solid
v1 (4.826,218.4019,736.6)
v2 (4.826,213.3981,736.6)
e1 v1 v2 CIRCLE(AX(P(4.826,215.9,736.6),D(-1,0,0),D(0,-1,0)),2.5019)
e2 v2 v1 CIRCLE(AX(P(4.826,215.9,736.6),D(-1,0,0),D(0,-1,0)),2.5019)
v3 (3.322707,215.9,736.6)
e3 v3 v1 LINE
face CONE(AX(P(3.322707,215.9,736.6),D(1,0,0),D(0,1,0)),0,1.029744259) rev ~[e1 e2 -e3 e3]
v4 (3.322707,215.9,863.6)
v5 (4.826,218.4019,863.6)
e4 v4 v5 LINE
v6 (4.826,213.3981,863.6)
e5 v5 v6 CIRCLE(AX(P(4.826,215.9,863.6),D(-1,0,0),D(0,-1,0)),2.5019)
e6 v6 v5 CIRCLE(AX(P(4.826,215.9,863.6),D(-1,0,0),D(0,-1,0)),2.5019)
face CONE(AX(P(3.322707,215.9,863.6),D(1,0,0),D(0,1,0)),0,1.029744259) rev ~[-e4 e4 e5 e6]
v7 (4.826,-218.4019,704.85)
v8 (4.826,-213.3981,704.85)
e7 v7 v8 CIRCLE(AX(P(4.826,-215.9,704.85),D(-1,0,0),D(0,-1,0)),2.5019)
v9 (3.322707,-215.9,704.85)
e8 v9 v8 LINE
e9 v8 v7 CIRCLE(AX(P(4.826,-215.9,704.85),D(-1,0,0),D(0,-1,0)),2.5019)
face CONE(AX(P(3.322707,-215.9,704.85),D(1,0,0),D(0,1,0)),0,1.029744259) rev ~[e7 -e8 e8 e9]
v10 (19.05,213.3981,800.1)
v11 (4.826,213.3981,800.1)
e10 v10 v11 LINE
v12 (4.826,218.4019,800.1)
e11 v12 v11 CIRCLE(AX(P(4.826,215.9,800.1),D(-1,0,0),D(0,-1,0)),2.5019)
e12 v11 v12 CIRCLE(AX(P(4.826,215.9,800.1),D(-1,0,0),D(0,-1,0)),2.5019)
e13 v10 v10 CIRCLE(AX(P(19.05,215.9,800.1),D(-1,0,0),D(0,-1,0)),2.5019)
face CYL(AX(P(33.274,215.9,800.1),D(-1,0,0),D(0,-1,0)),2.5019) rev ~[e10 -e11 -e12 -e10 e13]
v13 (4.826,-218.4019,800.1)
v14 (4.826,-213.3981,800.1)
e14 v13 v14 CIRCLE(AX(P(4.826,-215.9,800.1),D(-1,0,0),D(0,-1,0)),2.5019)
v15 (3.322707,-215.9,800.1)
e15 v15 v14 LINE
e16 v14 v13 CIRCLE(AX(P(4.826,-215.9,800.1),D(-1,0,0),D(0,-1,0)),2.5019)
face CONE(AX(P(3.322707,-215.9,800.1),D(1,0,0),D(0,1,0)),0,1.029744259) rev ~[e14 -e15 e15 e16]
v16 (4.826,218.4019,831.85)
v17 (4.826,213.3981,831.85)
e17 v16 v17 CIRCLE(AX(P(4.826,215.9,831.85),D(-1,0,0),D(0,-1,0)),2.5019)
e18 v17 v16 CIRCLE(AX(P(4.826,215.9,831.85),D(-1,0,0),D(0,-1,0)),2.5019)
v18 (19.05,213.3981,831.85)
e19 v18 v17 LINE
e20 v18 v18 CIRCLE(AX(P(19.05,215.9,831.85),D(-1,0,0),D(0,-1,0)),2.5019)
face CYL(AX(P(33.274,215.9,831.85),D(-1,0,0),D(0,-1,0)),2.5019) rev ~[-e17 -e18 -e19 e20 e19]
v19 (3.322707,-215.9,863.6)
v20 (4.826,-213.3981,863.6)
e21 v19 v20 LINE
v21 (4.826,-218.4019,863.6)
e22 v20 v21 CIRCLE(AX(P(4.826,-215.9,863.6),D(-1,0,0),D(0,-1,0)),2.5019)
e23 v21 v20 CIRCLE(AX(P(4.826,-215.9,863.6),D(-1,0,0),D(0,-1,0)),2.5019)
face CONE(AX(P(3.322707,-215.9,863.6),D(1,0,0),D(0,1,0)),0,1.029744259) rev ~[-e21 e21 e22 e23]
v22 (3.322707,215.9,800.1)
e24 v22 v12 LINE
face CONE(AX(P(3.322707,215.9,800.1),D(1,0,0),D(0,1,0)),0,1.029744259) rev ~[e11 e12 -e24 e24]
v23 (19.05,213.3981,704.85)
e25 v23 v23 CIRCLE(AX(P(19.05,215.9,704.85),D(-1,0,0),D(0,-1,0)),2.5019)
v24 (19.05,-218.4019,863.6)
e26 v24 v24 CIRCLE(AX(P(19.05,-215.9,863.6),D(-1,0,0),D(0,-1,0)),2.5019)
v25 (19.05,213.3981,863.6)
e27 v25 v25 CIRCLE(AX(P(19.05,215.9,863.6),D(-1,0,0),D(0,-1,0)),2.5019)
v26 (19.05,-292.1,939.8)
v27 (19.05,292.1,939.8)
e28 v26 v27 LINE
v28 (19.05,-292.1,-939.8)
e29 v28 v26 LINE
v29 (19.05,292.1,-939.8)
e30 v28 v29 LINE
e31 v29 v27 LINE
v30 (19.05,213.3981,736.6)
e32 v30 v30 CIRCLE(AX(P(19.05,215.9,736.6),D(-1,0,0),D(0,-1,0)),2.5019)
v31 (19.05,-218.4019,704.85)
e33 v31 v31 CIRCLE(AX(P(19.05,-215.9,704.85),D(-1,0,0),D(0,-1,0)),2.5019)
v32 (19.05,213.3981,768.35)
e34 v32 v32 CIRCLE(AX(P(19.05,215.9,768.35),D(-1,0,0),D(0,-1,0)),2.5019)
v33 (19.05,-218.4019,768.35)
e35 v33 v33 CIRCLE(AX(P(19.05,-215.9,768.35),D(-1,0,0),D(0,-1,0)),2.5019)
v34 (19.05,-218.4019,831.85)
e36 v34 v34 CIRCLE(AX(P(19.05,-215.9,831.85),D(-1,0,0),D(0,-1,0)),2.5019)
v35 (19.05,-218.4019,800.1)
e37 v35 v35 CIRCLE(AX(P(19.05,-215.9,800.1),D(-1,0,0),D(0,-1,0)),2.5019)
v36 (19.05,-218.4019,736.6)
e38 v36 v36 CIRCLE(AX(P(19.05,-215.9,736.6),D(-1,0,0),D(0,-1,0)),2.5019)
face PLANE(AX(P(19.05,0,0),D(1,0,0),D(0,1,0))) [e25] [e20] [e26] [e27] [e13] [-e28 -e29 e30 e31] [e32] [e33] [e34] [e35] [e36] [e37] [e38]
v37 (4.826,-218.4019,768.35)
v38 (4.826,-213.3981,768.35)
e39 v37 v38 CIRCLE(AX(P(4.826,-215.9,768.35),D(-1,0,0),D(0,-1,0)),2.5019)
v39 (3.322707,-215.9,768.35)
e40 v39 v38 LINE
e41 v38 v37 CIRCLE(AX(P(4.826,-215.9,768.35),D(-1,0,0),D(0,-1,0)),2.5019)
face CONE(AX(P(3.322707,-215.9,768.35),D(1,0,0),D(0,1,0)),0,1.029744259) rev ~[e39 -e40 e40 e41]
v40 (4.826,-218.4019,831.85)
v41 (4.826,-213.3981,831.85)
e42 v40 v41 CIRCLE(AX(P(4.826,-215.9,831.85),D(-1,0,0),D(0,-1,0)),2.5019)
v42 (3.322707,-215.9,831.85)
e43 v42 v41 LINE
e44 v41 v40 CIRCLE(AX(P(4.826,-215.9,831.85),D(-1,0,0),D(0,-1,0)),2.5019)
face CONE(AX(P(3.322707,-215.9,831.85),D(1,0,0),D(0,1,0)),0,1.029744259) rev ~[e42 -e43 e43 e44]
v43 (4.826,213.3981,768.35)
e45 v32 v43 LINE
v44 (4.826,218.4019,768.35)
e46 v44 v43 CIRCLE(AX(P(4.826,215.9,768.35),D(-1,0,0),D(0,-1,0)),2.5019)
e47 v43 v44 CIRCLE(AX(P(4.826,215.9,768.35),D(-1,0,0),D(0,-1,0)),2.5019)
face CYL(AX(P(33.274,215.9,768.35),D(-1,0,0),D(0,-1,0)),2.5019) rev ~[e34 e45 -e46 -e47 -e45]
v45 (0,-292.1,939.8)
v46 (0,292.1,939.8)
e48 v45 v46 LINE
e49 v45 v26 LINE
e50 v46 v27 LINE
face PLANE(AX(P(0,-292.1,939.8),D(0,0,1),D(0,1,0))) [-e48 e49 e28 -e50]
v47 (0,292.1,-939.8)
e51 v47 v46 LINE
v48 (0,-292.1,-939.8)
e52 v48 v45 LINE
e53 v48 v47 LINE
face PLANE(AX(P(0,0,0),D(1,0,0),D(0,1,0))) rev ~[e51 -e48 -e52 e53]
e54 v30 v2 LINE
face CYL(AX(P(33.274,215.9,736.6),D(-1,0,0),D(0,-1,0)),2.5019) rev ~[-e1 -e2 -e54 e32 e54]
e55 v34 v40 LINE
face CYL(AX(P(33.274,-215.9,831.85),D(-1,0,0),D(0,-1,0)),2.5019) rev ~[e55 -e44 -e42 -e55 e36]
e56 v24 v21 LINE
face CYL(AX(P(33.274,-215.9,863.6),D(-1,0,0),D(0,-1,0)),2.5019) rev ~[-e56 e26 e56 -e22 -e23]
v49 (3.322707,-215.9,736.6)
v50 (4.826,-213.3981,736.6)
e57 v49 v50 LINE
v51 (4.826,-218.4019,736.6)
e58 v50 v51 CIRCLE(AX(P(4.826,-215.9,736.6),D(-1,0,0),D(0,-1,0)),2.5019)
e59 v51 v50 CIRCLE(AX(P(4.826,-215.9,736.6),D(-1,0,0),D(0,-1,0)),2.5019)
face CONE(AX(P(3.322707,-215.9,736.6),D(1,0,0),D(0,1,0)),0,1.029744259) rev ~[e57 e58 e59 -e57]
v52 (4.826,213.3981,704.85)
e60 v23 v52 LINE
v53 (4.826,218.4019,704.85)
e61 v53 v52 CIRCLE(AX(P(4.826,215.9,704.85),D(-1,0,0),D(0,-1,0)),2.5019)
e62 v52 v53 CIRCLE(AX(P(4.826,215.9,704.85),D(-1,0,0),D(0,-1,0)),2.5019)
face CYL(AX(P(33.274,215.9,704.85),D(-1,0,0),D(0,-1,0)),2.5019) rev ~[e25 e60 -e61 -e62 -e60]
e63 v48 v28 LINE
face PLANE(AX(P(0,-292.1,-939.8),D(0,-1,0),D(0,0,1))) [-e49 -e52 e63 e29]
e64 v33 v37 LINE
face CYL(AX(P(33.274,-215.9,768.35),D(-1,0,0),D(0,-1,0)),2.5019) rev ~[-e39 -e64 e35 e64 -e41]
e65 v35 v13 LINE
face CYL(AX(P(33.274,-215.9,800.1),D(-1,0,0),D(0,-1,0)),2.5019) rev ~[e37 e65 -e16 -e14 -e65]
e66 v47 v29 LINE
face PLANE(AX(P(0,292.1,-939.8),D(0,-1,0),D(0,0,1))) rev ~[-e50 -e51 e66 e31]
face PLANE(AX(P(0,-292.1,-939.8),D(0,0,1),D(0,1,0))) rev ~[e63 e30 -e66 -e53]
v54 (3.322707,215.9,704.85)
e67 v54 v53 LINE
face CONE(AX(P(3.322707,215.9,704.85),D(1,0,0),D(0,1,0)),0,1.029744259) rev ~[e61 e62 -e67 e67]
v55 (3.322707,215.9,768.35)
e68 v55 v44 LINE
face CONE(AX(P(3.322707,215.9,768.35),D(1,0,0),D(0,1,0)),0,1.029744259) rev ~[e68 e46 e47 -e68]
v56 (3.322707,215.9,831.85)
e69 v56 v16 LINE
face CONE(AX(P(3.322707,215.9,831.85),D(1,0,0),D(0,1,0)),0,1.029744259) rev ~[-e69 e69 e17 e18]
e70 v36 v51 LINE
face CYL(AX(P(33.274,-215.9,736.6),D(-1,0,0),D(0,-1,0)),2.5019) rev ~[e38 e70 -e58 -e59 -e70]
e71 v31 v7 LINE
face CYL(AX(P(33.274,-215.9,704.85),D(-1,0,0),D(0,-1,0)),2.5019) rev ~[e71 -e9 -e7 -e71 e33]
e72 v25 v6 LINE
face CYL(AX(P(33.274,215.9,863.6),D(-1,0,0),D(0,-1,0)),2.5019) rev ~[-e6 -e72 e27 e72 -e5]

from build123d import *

# Parameters (mm, degrees)
F0_W     = 584.2
F0_H     = 1879.6
F1_DEPTH = 19.05
F3_D     = 5.0038
F3_DEPTH = 14.224
F3_TIP   = 1.5032931827


# Not quite as in the source:
# - a feature names something its author has since deleted; it is built from what else it names


with BuildPart() as f1:
    # F0 (on Right) → F1 (new body)
    with BuildSketch(Plane.YZ):
        Rectangle(F0_W, F0_H)
    extrude(amount=F1_DEPTH)

    # F3
    with Locations(Plane.YZ.offset(19.05)):
        with Locations((-215.9, 863.6), (-215.9, 831.85), (-215.9, 800.1), (-215.9, 768.35), (-215.9, 736.6), (215.9, 863.6), (215.9, 831.85), (215.9, 800.1), (215.9, 768.35), (215.9, 736.6), (-215.9, 704.85), (215.9, 704.85)):
            Hole(F3_D / 2, depth=F3_DEPTH)
            with Locations((0, 0, -(F3_DEPTH + F3_TIP / 2))):  # 118° drill point
                Cone(0, F3_D / 2, F3_TIP, mode=Mode.SUBTRACT)


solid = f1.part
